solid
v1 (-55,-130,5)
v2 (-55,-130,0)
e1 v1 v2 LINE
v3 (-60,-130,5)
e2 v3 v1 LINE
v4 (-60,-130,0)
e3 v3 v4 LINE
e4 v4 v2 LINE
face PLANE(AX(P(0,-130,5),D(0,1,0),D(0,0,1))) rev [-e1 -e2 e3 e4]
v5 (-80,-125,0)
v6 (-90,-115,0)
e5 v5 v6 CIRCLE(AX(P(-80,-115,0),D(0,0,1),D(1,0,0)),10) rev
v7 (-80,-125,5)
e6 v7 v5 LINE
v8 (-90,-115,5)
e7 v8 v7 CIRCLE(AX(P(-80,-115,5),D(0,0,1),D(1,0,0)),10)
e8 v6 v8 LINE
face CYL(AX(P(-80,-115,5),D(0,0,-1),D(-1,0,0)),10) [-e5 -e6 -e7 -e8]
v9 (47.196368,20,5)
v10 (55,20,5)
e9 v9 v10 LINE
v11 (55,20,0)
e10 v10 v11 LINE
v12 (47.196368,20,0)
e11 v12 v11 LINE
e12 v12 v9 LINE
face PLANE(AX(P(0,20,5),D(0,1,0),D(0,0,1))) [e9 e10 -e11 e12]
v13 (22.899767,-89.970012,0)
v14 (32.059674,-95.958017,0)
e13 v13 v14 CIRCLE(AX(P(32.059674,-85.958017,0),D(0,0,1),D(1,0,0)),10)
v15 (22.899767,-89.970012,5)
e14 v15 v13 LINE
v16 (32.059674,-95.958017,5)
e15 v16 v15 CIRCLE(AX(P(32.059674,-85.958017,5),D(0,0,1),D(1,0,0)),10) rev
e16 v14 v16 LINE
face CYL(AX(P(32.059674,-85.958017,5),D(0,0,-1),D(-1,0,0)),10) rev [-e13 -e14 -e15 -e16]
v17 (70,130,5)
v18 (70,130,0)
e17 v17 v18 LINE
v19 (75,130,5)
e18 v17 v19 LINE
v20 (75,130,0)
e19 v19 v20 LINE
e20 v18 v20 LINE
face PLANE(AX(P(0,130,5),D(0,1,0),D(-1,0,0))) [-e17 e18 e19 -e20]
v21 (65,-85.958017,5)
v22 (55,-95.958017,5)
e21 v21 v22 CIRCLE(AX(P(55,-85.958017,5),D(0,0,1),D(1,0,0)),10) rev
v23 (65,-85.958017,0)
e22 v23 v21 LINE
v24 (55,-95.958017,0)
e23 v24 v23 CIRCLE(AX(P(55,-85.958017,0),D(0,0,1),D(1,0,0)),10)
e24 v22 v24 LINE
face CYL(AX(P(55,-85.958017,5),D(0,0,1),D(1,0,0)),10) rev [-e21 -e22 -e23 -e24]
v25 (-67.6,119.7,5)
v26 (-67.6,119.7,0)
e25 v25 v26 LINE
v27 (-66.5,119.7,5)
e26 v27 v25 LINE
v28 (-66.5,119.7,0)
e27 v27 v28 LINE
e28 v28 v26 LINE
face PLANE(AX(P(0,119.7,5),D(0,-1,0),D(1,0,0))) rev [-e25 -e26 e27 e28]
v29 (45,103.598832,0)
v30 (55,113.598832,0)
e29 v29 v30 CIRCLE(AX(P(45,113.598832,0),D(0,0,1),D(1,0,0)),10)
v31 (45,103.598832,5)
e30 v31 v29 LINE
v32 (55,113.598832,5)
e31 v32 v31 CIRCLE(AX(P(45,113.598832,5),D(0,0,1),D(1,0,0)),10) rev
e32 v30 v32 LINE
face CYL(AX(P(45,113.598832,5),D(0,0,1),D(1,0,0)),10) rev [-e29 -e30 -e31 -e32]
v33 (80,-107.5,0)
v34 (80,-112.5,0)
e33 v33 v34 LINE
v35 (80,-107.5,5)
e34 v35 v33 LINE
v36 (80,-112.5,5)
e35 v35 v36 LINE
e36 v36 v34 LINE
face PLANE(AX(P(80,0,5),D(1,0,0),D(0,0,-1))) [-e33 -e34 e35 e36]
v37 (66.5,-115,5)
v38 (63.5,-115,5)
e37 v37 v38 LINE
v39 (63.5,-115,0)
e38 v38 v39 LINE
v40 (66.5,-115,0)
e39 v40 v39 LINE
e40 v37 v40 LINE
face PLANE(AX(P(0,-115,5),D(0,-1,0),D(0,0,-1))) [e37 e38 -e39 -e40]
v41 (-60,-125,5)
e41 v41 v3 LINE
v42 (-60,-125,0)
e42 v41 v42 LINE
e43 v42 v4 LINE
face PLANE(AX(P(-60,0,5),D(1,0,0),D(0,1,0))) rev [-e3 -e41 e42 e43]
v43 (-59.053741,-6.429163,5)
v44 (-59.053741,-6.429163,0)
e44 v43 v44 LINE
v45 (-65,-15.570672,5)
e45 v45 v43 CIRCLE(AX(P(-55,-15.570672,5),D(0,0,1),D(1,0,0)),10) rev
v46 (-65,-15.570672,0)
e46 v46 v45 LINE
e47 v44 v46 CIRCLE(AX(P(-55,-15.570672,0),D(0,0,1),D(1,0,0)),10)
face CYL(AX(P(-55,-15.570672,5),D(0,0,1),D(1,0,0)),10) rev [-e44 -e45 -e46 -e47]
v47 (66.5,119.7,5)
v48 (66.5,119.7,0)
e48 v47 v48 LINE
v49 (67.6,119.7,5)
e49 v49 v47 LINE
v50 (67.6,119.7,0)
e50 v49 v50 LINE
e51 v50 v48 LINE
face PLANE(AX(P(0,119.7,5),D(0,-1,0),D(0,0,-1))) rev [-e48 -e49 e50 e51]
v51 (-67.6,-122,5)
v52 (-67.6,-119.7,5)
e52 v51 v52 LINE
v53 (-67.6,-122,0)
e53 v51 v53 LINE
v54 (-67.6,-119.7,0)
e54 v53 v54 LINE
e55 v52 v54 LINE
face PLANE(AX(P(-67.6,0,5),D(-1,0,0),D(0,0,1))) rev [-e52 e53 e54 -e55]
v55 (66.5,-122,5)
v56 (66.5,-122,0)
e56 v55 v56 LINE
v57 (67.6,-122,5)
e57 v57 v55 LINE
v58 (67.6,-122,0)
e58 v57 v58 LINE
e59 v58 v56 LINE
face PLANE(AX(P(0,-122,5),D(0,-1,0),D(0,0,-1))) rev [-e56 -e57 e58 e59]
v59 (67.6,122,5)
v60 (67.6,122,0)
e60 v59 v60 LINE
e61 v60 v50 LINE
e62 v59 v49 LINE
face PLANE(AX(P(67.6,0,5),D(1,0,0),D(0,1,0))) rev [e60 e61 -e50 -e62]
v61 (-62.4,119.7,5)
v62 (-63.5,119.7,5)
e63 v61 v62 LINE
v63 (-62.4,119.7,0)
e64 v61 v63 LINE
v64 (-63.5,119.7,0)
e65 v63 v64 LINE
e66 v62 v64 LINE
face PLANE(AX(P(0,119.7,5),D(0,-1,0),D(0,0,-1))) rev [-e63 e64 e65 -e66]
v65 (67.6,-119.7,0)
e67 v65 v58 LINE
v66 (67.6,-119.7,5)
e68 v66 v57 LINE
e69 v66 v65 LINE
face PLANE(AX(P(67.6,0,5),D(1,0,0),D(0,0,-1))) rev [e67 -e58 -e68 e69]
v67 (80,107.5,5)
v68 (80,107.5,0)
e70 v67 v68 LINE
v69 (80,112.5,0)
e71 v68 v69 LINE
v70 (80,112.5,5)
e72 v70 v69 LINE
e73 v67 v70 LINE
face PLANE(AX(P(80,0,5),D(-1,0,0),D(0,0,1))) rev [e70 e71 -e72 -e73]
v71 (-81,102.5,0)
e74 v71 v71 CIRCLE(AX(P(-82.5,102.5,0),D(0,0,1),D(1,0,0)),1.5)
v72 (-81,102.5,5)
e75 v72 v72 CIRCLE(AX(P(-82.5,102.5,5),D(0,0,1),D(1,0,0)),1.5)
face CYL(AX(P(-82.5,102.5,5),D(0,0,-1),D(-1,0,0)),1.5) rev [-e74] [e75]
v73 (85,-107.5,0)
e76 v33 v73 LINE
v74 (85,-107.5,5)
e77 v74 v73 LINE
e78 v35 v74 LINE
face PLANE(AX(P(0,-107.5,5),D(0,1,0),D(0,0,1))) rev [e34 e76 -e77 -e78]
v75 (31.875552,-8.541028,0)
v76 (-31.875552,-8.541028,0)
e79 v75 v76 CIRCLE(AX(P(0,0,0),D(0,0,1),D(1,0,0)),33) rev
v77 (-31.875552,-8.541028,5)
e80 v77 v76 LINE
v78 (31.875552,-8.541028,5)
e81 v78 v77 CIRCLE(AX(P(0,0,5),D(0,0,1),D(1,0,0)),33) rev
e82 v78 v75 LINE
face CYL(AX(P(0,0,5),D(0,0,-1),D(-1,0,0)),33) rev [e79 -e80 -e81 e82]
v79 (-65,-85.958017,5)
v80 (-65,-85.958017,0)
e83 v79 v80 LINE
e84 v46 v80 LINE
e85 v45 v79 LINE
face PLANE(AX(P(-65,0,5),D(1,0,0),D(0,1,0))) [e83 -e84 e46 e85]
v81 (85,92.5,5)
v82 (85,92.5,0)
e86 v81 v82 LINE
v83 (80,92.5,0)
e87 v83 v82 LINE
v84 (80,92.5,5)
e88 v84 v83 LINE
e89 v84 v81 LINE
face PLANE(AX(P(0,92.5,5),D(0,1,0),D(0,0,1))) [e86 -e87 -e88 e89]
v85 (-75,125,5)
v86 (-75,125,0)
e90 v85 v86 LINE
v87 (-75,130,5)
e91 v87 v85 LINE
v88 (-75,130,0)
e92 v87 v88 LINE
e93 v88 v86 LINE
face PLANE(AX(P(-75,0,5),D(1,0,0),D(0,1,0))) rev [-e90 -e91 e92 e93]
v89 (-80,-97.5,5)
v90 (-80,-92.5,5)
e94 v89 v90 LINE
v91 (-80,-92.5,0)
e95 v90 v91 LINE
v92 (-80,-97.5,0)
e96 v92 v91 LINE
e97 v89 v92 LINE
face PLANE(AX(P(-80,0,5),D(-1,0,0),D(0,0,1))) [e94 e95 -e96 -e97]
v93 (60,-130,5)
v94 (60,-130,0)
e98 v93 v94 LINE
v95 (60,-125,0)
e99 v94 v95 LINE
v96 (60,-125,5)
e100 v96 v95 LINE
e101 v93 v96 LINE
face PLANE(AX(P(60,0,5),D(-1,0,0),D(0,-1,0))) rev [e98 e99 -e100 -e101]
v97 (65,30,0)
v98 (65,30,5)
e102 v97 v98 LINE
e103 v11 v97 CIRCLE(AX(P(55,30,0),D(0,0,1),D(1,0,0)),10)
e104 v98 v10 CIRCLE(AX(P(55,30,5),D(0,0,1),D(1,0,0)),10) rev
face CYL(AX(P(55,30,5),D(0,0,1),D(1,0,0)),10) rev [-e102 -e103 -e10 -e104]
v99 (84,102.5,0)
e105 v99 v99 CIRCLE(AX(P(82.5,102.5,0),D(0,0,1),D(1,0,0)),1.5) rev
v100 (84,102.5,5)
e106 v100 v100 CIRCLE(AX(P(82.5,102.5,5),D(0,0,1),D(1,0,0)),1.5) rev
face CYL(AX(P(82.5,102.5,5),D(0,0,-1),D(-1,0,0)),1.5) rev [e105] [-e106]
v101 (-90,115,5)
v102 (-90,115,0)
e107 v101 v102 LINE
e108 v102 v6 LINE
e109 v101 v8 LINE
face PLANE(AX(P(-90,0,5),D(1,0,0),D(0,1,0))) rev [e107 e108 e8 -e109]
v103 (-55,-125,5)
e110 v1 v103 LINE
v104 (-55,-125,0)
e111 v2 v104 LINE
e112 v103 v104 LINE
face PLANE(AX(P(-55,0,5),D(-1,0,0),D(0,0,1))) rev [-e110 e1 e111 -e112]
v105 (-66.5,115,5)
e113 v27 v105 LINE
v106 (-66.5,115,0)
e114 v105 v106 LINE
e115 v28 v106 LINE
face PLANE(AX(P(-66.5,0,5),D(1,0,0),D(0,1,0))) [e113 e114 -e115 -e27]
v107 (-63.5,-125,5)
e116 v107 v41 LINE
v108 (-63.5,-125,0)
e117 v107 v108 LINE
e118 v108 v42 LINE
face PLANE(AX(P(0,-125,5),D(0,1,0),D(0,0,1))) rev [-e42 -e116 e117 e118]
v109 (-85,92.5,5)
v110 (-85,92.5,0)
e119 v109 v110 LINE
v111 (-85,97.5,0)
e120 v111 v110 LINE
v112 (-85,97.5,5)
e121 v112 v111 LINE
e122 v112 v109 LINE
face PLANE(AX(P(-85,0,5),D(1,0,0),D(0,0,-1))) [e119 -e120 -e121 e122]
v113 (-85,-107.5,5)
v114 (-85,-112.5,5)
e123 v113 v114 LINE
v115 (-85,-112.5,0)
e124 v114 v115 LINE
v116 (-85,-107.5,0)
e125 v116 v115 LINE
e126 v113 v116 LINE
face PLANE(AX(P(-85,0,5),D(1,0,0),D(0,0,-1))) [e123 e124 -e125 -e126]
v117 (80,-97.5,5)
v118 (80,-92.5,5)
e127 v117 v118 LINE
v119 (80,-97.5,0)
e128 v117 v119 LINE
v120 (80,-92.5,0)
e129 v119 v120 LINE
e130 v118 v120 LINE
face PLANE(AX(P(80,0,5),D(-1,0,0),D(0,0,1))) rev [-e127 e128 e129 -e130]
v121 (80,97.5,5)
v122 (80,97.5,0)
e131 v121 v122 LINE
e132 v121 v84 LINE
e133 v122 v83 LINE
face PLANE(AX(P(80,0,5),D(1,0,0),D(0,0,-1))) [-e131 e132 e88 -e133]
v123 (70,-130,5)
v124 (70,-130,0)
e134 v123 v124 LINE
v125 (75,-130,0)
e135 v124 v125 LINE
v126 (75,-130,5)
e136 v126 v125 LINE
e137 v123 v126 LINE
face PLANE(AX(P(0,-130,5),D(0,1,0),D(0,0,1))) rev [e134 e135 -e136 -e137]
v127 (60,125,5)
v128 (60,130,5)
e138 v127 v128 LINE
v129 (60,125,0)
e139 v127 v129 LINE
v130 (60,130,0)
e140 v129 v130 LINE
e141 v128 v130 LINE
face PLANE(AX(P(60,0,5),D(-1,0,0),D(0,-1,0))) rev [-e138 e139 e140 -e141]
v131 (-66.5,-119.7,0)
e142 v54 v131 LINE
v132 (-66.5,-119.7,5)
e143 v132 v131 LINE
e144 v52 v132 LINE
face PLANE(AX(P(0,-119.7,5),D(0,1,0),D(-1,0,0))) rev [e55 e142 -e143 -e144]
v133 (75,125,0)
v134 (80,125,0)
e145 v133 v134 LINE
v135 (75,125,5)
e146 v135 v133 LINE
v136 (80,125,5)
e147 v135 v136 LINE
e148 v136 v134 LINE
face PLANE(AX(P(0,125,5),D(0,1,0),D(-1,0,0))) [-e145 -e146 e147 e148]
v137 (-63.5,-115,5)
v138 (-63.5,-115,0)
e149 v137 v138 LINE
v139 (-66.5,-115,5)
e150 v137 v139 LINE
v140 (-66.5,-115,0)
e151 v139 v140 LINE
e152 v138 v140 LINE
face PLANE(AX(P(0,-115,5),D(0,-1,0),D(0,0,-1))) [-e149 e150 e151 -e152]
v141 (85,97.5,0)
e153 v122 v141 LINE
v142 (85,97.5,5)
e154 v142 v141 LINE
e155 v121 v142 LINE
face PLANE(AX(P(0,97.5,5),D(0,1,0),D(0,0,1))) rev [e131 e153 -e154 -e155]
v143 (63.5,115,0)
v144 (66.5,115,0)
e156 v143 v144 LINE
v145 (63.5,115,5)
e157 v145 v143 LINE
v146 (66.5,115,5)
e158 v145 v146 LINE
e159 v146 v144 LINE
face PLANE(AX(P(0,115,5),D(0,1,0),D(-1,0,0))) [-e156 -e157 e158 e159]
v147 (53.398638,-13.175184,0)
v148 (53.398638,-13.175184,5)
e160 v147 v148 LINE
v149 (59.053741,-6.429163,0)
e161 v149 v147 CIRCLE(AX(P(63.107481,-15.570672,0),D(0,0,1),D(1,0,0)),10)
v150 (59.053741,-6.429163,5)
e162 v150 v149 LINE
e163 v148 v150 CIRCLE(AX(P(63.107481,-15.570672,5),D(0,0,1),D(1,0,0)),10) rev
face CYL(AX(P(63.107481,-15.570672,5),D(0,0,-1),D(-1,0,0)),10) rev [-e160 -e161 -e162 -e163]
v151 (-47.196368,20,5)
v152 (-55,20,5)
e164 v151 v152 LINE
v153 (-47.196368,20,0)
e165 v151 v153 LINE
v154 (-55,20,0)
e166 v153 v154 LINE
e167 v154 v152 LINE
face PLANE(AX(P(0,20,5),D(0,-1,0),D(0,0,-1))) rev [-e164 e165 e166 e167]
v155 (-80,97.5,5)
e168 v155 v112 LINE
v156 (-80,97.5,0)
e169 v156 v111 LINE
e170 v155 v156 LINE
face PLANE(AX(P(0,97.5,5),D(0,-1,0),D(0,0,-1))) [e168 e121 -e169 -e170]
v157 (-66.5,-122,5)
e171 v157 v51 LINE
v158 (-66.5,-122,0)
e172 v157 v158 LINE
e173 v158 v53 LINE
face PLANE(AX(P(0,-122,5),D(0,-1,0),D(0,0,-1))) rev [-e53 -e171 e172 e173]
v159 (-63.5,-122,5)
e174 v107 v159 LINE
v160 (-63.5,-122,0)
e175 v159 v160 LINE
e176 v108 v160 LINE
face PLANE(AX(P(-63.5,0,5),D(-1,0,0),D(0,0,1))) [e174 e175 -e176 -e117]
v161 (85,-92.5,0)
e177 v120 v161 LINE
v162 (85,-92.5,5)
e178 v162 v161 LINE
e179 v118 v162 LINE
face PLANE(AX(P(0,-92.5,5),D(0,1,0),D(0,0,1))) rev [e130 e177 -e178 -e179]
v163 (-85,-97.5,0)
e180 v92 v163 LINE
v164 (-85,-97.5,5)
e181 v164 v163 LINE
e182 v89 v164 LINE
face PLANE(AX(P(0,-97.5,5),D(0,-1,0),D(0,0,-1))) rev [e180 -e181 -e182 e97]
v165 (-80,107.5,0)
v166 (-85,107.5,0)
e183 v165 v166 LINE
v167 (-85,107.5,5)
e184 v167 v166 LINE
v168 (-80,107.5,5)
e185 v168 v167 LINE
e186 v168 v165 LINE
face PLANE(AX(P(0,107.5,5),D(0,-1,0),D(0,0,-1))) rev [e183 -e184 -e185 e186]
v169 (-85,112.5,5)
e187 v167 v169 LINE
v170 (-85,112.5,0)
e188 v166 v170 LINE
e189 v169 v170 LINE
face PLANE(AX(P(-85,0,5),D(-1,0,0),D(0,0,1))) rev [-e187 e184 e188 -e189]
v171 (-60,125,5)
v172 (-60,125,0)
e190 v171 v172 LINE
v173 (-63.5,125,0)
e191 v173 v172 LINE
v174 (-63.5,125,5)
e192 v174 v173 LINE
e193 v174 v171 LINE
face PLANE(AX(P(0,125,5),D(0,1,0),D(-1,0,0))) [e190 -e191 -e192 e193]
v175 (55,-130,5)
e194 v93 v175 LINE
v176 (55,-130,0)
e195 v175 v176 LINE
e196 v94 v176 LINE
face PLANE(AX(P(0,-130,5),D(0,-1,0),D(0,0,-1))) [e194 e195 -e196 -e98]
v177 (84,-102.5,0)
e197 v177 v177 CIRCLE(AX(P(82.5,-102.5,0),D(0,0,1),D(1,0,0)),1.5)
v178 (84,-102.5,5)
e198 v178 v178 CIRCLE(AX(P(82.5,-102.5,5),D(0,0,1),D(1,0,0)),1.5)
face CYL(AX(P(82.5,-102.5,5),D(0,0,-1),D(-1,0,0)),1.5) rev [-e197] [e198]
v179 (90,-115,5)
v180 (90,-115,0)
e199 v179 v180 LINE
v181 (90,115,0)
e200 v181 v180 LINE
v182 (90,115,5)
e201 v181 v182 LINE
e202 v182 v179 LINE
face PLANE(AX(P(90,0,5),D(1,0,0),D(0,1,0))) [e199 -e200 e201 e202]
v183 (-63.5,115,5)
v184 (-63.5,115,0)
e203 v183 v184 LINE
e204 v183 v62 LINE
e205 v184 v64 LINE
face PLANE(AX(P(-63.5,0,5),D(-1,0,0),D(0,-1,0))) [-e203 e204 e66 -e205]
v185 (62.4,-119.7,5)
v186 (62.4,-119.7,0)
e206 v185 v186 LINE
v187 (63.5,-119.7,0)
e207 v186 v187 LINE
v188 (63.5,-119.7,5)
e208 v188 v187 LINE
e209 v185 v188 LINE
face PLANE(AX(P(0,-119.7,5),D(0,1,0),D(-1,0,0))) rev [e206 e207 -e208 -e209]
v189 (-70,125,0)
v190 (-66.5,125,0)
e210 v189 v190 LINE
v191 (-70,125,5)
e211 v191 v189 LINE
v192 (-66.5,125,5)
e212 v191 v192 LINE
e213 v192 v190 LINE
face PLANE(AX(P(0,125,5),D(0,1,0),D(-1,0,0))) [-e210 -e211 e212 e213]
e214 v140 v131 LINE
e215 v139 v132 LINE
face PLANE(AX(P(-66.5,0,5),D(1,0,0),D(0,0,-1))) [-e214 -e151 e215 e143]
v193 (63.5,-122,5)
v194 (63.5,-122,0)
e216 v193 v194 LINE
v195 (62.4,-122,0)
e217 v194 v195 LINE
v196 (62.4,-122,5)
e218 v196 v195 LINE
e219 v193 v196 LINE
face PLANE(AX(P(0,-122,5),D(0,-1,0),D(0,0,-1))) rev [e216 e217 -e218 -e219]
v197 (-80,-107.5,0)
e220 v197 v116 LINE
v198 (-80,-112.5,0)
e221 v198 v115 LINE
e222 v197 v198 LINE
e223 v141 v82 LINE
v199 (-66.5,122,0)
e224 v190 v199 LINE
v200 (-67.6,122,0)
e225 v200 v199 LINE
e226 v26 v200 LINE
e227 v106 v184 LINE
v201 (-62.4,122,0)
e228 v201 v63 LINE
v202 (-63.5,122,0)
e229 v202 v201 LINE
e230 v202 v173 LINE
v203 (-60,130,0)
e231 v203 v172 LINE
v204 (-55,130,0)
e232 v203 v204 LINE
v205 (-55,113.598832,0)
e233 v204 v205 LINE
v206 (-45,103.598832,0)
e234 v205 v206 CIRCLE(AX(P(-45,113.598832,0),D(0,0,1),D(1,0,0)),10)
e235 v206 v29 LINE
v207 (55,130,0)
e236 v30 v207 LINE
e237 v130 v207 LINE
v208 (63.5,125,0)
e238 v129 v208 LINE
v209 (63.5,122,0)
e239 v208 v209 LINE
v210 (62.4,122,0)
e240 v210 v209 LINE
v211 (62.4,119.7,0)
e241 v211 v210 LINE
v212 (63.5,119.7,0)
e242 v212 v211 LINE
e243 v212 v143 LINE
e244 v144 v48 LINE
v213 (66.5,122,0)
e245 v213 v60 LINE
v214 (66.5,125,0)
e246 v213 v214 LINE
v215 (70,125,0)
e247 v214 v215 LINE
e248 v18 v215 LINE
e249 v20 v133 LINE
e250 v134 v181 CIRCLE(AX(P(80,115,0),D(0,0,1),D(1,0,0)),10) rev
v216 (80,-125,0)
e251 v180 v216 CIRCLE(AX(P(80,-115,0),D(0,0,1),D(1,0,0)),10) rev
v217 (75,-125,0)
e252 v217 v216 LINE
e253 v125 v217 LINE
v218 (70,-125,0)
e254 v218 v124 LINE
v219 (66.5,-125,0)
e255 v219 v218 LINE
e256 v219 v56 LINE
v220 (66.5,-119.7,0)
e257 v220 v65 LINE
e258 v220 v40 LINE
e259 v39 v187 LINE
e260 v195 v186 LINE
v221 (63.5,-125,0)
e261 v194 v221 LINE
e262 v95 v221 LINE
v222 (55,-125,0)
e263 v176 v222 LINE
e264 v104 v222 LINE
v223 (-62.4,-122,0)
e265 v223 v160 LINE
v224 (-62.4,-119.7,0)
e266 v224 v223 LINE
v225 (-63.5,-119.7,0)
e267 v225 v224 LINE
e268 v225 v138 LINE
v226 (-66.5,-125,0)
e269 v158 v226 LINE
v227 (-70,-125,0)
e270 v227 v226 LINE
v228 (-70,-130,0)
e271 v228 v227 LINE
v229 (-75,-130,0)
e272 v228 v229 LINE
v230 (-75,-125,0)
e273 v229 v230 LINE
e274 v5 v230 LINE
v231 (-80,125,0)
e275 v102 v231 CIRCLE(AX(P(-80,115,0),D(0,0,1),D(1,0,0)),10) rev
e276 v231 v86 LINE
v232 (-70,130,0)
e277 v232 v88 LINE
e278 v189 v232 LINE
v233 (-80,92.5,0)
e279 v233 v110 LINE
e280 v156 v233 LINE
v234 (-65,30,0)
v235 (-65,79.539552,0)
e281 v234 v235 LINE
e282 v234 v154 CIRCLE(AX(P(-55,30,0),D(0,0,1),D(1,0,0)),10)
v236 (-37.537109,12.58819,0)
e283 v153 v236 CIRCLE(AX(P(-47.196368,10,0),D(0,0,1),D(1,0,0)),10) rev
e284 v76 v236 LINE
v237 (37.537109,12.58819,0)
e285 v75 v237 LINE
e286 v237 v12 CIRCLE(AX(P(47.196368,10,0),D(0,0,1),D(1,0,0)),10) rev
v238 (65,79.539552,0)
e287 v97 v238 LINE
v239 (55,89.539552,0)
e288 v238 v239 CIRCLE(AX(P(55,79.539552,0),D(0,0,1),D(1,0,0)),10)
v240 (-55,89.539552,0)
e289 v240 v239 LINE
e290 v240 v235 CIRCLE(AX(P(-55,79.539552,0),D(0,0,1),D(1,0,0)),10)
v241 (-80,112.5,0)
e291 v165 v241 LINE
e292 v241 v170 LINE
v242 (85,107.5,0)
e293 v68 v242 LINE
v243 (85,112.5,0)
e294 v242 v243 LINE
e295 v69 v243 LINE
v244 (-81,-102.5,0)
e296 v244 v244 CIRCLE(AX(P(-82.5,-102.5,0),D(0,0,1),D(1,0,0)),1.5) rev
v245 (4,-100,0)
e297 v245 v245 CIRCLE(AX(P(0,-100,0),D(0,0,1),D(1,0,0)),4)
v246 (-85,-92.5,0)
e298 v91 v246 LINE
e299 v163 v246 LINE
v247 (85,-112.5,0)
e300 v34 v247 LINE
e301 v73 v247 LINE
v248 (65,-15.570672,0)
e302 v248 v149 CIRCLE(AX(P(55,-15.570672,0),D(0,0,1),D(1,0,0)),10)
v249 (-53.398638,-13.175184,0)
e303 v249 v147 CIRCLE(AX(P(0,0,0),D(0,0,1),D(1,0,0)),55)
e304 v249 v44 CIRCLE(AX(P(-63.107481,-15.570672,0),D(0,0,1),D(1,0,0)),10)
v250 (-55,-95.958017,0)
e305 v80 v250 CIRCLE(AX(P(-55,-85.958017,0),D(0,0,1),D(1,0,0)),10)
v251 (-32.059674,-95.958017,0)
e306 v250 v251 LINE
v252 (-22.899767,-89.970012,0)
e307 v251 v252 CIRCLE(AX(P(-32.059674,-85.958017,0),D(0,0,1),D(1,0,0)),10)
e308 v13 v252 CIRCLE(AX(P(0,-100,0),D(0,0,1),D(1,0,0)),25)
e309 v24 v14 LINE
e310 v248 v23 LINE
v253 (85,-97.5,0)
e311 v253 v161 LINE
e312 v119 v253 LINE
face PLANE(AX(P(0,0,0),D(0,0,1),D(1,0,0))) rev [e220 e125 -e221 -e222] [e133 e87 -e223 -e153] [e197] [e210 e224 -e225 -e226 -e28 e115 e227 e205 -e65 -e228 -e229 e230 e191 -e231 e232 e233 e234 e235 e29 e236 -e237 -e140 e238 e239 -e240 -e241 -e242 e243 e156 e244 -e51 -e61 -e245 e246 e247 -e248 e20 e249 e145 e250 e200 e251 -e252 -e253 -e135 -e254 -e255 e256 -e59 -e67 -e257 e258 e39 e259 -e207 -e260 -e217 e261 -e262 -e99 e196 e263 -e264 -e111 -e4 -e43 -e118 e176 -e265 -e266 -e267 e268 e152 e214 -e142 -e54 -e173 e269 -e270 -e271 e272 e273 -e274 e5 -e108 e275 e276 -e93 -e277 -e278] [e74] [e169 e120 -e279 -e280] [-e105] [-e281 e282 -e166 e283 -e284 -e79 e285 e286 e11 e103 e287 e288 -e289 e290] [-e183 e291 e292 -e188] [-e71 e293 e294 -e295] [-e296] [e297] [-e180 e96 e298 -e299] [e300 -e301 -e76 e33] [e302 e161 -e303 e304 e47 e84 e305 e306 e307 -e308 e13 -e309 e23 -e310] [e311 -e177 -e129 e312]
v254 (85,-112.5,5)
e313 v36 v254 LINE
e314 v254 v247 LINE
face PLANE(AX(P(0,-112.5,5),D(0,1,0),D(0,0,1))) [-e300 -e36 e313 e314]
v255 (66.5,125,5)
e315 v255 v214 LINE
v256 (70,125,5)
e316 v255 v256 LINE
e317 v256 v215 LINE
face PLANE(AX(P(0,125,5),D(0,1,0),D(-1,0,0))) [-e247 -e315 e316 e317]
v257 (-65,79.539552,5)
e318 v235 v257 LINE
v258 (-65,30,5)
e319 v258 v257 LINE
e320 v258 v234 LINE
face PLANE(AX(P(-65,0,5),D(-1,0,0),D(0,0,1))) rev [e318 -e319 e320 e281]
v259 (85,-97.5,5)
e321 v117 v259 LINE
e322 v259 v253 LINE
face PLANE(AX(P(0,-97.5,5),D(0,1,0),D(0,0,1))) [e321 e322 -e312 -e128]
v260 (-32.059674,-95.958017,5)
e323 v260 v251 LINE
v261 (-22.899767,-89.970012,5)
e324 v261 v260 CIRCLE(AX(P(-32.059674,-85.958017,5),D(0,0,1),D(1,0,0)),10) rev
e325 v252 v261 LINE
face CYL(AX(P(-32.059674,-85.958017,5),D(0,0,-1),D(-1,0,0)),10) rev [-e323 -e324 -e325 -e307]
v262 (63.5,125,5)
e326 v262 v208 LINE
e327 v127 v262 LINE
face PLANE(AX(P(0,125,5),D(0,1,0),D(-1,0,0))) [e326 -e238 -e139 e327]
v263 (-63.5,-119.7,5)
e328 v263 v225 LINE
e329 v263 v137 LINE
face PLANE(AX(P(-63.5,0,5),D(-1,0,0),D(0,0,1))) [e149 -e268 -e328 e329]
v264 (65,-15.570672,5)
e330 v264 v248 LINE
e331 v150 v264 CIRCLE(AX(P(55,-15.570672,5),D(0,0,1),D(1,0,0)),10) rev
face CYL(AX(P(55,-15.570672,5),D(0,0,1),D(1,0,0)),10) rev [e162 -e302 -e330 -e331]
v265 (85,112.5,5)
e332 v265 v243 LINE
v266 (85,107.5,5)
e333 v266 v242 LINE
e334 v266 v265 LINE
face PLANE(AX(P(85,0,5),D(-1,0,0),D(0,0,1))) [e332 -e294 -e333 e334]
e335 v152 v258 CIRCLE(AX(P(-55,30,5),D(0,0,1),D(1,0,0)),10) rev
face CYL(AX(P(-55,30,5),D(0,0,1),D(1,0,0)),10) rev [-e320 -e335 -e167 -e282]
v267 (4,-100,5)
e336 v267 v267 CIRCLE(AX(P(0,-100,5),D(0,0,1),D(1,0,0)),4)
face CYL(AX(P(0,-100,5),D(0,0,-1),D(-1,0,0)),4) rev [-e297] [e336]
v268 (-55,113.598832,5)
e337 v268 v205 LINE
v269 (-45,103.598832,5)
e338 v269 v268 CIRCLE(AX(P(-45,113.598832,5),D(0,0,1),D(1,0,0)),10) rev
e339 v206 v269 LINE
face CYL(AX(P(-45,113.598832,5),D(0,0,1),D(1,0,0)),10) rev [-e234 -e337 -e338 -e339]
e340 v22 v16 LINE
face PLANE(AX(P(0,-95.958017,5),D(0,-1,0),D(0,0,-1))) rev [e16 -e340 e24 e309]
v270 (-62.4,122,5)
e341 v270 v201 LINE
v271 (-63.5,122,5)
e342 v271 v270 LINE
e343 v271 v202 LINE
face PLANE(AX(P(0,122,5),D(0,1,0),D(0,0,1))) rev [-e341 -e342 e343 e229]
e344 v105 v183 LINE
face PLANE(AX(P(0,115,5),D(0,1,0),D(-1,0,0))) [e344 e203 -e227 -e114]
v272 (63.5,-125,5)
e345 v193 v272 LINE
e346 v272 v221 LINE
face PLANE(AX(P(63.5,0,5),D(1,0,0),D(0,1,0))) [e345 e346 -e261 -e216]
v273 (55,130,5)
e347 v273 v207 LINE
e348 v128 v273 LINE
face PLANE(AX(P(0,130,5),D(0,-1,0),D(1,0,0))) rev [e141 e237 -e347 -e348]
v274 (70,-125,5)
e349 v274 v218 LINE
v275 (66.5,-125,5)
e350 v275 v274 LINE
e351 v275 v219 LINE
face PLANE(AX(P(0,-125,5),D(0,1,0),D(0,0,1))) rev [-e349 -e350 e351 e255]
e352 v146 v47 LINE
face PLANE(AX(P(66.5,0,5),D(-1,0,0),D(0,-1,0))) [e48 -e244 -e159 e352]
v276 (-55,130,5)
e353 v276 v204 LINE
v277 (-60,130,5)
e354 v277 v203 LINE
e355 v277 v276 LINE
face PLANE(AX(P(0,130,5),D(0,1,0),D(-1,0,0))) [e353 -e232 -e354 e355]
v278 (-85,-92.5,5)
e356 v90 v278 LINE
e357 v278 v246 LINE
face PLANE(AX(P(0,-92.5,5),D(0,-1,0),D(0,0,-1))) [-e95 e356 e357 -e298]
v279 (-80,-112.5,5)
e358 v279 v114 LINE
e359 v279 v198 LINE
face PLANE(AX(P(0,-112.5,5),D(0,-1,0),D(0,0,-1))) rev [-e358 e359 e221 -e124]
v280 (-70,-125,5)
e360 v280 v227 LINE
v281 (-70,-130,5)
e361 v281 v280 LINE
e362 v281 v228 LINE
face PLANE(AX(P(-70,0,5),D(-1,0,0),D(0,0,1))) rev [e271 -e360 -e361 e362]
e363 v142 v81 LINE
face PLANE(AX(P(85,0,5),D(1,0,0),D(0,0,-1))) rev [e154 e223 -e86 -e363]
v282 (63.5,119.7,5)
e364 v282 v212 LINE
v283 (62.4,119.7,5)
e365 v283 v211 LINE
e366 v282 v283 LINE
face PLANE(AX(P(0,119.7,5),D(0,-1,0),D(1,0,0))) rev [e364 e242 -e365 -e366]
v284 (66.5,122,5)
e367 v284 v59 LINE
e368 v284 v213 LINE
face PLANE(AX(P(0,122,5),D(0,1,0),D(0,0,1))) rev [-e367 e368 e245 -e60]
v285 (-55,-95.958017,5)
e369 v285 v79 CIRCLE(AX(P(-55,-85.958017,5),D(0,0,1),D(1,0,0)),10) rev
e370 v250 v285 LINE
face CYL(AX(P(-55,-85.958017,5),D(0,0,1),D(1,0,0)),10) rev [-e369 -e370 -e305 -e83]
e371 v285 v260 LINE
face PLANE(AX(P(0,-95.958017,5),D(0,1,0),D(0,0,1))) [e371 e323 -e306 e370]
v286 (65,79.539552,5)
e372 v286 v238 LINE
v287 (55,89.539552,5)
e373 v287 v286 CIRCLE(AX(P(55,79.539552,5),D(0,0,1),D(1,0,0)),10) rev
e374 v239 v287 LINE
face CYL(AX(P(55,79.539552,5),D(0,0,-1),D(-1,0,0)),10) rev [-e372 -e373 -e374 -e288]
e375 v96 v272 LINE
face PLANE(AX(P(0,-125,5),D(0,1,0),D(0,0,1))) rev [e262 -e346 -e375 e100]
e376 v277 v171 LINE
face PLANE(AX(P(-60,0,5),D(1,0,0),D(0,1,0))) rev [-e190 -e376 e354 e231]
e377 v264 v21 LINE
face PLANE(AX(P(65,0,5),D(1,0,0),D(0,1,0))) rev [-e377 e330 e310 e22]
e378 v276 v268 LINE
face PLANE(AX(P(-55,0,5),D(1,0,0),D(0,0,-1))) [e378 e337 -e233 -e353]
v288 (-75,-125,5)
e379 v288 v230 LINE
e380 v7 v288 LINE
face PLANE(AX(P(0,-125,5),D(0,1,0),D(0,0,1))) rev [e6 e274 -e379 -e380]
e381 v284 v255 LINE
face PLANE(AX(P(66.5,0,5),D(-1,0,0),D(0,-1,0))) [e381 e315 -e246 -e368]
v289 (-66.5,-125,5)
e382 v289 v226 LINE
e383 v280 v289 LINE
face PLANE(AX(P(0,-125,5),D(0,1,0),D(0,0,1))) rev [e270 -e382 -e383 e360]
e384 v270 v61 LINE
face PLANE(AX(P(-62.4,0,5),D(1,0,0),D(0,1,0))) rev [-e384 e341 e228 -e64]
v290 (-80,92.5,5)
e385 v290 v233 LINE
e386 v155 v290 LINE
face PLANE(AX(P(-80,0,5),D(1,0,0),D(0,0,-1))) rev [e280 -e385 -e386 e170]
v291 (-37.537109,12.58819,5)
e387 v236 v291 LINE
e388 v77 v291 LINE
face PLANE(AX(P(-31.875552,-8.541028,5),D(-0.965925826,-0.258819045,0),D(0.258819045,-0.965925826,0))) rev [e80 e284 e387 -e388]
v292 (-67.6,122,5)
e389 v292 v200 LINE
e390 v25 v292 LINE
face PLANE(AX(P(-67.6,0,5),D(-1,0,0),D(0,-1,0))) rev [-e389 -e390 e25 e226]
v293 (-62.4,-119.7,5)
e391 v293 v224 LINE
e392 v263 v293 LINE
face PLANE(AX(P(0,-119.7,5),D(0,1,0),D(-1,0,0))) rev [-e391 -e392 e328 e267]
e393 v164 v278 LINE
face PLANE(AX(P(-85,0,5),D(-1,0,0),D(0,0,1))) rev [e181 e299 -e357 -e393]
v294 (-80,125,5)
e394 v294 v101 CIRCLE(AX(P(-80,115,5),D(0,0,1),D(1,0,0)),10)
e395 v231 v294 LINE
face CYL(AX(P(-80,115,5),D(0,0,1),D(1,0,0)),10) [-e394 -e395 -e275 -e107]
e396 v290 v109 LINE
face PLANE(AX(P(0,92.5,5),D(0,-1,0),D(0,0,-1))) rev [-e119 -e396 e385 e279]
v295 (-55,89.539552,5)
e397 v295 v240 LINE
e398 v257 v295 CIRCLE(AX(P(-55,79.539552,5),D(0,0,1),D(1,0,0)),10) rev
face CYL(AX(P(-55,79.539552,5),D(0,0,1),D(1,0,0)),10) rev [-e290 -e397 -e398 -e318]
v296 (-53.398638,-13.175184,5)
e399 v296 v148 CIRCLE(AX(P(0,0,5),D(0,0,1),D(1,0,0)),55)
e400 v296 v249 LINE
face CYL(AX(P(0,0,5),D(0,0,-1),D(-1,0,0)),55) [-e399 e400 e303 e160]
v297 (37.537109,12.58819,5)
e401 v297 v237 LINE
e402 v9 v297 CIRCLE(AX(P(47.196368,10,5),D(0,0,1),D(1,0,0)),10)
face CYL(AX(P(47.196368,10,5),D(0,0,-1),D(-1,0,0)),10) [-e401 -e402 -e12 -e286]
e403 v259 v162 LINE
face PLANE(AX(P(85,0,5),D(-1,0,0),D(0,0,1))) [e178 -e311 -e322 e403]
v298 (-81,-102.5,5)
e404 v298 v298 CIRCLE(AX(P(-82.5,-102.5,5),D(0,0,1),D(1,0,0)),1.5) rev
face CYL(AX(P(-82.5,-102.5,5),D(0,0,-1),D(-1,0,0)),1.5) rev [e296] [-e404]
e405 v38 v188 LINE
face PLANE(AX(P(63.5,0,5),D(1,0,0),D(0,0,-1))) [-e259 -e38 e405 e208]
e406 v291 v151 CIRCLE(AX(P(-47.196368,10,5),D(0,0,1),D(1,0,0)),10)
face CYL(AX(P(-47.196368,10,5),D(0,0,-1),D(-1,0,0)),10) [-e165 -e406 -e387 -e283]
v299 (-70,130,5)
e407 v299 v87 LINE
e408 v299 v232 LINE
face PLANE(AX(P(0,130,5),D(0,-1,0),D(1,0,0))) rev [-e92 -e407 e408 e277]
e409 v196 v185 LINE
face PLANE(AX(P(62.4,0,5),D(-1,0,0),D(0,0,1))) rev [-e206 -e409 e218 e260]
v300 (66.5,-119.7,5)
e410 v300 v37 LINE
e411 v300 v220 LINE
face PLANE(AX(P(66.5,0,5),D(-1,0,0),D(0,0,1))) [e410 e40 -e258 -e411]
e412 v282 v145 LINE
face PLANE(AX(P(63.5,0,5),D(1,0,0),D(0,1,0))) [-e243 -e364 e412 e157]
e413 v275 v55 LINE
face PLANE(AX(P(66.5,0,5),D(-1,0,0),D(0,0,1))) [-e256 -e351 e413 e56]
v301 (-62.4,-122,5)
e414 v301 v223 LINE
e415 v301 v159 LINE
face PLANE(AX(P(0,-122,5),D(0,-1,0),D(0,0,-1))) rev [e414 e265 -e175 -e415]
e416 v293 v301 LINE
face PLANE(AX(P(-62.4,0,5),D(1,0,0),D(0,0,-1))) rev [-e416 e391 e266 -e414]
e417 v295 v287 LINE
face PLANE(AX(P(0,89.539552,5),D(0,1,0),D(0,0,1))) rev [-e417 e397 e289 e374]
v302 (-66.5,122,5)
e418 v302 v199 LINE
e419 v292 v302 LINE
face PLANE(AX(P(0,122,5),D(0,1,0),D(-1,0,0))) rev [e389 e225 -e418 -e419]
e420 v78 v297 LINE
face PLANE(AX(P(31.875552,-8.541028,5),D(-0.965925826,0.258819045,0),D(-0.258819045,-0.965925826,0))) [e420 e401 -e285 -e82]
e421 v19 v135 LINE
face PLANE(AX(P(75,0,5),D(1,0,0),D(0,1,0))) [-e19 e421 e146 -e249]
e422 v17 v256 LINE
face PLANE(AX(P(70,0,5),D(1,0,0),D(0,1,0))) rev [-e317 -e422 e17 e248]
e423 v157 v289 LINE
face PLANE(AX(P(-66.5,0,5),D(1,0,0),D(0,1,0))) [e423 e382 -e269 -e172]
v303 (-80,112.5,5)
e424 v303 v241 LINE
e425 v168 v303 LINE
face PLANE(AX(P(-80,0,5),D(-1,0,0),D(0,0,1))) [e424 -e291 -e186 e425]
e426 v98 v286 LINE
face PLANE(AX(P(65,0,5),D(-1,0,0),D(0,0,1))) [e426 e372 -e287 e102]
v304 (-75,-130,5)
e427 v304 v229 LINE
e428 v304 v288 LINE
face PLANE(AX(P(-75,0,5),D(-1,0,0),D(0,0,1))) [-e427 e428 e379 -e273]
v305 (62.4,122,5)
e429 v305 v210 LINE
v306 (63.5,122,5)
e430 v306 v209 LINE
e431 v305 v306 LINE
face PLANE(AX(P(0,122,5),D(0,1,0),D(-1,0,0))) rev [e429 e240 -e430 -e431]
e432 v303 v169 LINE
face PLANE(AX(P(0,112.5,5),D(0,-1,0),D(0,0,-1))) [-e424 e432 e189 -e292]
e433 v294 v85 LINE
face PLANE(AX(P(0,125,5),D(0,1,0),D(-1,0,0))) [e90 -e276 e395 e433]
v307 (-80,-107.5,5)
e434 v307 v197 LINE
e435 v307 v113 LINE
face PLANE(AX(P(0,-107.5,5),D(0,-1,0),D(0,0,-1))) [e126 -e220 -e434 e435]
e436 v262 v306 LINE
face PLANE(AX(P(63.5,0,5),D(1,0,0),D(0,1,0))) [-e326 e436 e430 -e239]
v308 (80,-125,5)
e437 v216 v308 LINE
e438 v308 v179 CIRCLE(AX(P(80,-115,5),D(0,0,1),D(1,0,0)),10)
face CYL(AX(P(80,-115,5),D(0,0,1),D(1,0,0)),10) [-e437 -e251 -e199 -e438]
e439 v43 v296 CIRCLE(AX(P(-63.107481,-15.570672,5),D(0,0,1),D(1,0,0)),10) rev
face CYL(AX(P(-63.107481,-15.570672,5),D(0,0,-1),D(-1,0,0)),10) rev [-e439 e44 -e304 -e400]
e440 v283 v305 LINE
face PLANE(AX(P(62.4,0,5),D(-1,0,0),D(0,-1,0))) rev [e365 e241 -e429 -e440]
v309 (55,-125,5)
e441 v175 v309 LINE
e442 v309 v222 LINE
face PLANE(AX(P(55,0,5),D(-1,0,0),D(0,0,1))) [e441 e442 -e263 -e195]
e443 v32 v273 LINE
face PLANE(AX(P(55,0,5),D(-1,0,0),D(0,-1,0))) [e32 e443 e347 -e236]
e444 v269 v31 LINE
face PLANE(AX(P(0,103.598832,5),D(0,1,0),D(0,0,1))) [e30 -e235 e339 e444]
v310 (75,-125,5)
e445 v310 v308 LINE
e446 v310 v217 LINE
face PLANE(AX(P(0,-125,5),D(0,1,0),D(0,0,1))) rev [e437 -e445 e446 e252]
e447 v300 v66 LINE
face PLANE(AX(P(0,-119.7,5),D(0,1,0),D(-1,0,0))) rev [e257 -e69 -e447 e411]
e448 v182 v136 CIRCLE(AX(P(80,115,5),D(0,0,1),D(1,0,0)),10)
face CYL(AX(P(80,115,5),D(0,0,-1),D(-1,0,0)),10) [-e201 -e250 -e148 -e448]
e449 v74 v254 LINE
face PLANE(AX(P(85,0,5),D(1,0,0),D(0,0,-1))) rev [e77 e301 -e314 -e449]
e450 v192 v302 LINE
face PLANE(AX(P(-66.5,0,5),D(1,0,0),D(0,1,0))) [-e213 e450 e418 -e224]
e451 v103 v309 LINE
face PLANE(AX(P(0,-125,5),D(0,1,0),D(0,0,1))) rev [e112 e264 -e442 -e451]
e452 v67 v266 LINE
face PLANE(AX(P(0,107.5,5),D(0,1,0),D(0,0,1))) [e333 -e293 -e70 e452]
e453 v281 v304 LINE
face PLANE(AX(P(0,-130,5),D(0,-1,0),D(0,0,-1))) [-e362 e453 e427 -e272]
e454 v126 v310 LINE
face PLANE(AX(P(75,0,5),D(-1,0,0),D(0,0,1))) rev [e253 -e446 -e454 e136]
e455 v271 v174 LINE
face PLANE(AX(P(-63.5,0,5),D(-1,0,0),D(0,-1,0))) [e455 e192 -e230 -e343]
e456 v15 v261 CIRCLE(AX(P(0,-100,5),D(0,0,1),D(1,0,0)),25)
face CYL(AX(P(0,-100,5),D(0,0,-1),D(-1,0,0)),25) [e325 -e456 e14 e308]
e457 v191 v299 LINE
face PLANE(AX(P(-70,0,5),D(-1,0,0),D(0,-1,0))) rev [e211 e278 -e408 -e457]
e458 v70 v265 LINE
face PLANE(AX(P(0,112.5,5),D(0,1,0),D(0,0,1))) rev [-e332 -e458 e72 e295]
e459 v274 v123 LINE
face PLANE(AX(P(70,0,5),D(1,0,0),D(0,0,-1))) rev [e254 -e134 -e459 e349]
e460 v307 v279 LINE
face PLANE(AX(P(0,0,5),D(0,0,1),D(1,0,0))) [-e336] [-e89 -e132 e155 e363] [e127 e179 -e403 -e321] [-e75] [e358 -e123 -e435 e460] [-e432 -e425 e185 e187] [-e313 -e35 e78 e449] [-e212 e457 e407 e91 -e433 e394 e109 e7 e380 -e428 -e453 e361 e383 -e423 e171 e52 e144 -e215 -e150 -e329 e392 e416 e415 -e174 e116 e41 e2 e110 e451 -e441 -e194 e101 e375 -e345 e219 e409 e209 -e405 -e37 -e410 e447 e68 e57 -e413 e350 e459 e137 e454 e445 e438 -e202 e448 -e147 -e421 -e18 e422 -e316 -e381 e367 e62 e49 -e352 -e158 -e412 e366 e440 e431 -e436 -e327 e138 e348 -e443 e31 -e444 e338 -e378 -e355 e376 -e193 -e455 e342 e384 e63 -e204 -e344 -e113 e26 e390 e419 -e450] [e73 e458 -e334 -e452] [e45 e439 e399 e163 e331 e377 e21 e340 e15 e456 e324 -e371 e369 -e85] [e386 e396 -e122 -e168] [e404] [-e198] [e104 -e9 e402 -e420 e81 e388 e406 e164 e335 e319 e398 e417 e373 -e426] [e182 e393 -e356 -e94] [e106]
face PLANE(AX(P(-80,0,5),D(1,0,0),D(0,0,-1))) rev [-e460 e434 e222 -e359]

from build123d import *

# Parameters (mm, degrees)
SKETCH1_W           = 5
SKETCH1_H           = 5
SKETCH1_R           = 1.5
SKETCH1_R_2         = 4
BOSS_EXTRUDE1_DEPTH = 5
FILLET1_R           = 10


with BuildPart() as part:
    # Sketch1 → Boss-Extrude1 (new body)
    with BuildSketch(Plane.XY):
        Polygon((-75, 125), (-90, 125), (-90, -125), (-75, -125), (-75, -130), (-70, -130), (-70, -125), (-66.5, -125), (-66.5, -122), (-67.6, -122), (-67.6, -119.7), (-66.5, -119.7), (-66.5, -115), (-63.5, -115), (-63.5, -119.7), (-62.4, -119.7), (-62.4, -122), (-63.5, -122), (-63.5, -125), (-60, -125), (-60, -130), (-55, -130), (-55, -125), (55, -125), (55, -130), (60, -130), (60, -125), (63.5, -125), (63.5, -122), (62.4, -122), (62.4, -119.7), (63.5, -119.7), (63.5, -115), (66.5, -115), (66.5, -119.7), (67.6, -119.7), (67.6, -122), (66.5, -122), (66.5, -125), (70, -125), (70, -130), (75, -130), (75, -125), (90, -125), (90, 125), (75, 125), (75, 130), (70, 130), (70, 125), (66.5, 125), (66.5, 122), (67.6, 122), (67.6, 119.7), (66.5, 119.7), (66.5, 115), (63.5, 115), (63.5, 119.7), (62.4, 119.7), (62.4, 122), (63.5, 122), (63.5, 125), (60, 125), (60, 130), (55, 130), (55, 103.598832104), (-55, 103.598832104), (-55, 130), (-60, 130), (-60, 125), (-63.5, 125), (-63.5, 122), (-62.4, 122), (-62.4, 119.7), (-63.5, 119.7), (-63.5, 115), (-66.5, 115), (-66.5, 119.7), (-67.6, 119.7), (-67.6, 122), (-66.5, 122), (-66.5, 125), (-70, 125), (-70, 130), (-75, 130), align=None)
        with Locations((-82.5, -110)):
            Rectangle(SKETCH1_W, SKETCH1_H, mode=Mode.SUBTRACT)
        with Locations((-82.5, -102.5)):
            Circle(SKETCH1_R, mode=Mode.SUBTRACT)
        with Locations((-82.5, -95)):
            Rectangle(SKETCH1_W, SKETCH1_H, mode=Mode.SUBTRACT)
        with Locations((0, -100)):
            Circle(SKETCH1_R_2, mode=Mode.SUBTRACT)
        with Locations((82.5, -110)):
            Rectangle(SKETCH1_W, SKETCH1_H, mode=Mode.SUBTRACT)
        with Locations((82.5, -102.5)):
            Circle(SKETCH1_R, mode=Mode.SUBTRACT)
        with Locations((82.5, -95)):
            Rectangle(SKETCH1_W, SKETCH1_H, mode=Mode.SUBTRACT)
        with BuildLine():
            Line((-65, -5.570672252), (-54.717160111, -5.570672252))
            ThreePointArc((-54.717160111, -5.570672252), (0, -55), (54.717160111, -5.570672252))
            Line((54.717160111, -5.570672252), (65, -5.570672252))
            Line((65, -5.570672252), (65, -95.958016924))
            Line((65, -95.958016924), (24.671083738, -95.958016924))
            ThreePointArc((24.671083738, -95.958016924), (0, -75), (-24.671083738, -95.958016924))
            Line((-24.671083738, -95.958016924), (-65, -95.958016924))
            Line((-65, -95.958016924), (-65, -5.570672252))
        make_face(mode=Mode.SUBTRACT)
        with Locations((-82.5, 95)):
            Rectangle(SKETCH1_W, SKETCH1_H, mode=Mode.SUBTRACT)
        with Locations((-82.5, 102.5)):
            Circle(SKETCH1_R, mode=Mode.SUBTRACT)
        with Locations((-82.5, 110)):
            Rectangle(SKETCH1_W, SKETCH1_H, mode=Mode.SUBTRACT)
        with BuildLine():
            ThreePointArc((31.875552268, -8.541028488), (0, -33), (-31.875552268, -8.541028488))
            Line((-31.875552268, -8.541028488), (-39.523097802, 20))
            Line((-39.523097802, 20), (-65, 20))
            Line((-65, 20), (-65, 89.539551807))
            Line((-65, 89.539551807), (65, 89.539551807))
            Line((65, 89.539551807), (65, 20))
            Line((65, 20), (39.523097802, 20))
            Line((39.523097802, 20), (31.875552268, -8.541028488))
        make_face(mode=Mode.SUBTRACT)
        with Locations((82.5, 95)):
            Rectangle(SKETCH1_W, SKETCH1_H, mode=Mode.SUBTRACT)
        with Locations((82.5, 102.5)):
            Circle(SKETCH1_R, mode=Mode.SUBTRACT)
        with Locations((82.5, 110)):
            Rectangle(SKETCH1_W, SKETCH1_H, mode=Mode.SUBTRACT)
    extrude(amount=BOSS_EXTRUDE1_DEPTH)

    # Fillet1
    # the kernel refuses this fillet: 10 mm, written as the material it adds along each edge
    with BuildSketch(Plane(origin=(-55, 103.598832104, 0), x_dir=(1, 0, 0), z_dir=(0, 0, 1)), Plane(origin=(55, 103.598832104, 0), x_dir=(0, 1, 0), z_dir=(0, 0, 1)), Plane(origin=(-65, -95.958016924, 0), x_dir=(1, 0, 0), z_dir=(0, 0, 1)), Plane(origin=(65, -95.958016924, 0), x_dir=(0, 1, 0), z_dir=(0, 0, 1)), Plane(origin=(65, -5.570672252, 0), x_dir=(-1, 0, 0), z_dir=(0, 0, 1)), Plane(origin=(-65, -5.570672252, 0), x_dir=(0, -1, 0), z_dir=(0, 0, 1)), Plane(origin=(65, 89.539551807, 0), x_dir=(-1, 0, 0), z_dir=(0, 0, 1)), Plane(origin=(-65, 89.539551807, 0), x_dir=(0, -1, 0), z_dir=(0, 0, 1)), Plane(origin=(65, 20, 0), x_dir=(0, 1, 0), z_dir=(0, 0, 1)), Plane(origin=(-65, 20, 0), x_dir=(1, 0, 0), z_dir=(0, 0, 1))) as fillet1_piece_1:
        with BuildLine():
            CenterArc((FILLET1_R, FILLET1_R), FILLET1_R, 180, 90)
            Line((0, FILLET1_R), (0, 0))
            Line((0, 0), (FILLET1_R, 0))
        make_face()
    extrude(amount=5)
    with BuildSketch(Plane(origin=(24.671083738, -95.958016924, 0), x_dir=(1, 0, 0), z_dir=(0, 0, 1))) as fillet1_piece_2:
        with BuildLine():
            CenterArc((7.388590485, 10), FILLET1_R, 203.653187484, 66.346812516)
            ThreePointArc((-1.771316436, 5.988004835), (-0.697963006, 3.049524687), (0, 0))
            Line((0, 0), (7.388590485, 0))
        make_face()
    extrude(amount=5)
    with BuildSketch(Plane(origin=(-24.671083738, -95.958016924, 0), x_dir=(-1, 0, 0), z_dir=(0, 0, 1))) as fillet1_piece_3:
        with BuildLine():
            CenterArc((7.388590485, -10), FILLET1_R, 90, 66.346812516)
            ThreePointArc((-1.771316436, -5.988004835), (-0.697963006, -3.049524687), (0, 0))
            Line((0, 0), (7.388590485, 0))
        make_face()
    extrude(amount=5)
    with BuildSketch(Plane(origin=(54.717160111, -5.570672252, 0), x_dir=(-0.17083790481511615, -0.9852991476086749, 0), z_dir=(0, 0, 1))) as fillet1_piece_4:
        with BuildLine():
            CenterArc((8.419606625, 9.975355126), FILLET1_R, 189.836540175, 76.140088059)
            Line((-1.433384851, 8.266976078), (0, 0))
            ThreePointArc((0, 0), (3.85898637, 0.135546807), (7.717972739, 0))
        make_face()
    extrude(amount=5)
    with BuildSketch(Plane(origin=(-54.717160111, -5.570672252, 0), x_dir=(-1, 0, 0), z_dir=(0, 0, 1))) as fillet1_piece_5:
        with BuildLine():
            CenterArc((8.390320948, 10), FILLET1_R, 193.859911941, 76.140088059)
            ThreePointArc((-1.318522292, 7.604511961), (-0.525706993, 3.825412513), (0, 0))
            Line((0, 0), (8.390320948, 0))
        make_face()
    extrude(amount=5)
    # the kernel refuses this fillet: 10 mm, written as the material it takes off along each edge
    with BuildSketch(Plane(origin=(-90, -125, -25), x_dir=(0, 1, 0), z_dir=(0, 0, 1)), Plane(origin=(90, -125, -25), x_dir=(-1, 0, 0), z_dir=(0, 0, 1)), Plane(origin=(-90, 125, -25), x_dir=(1, 0, 0), z_dir=(0, 0, 1)), Plane(origin=(90, 125, -25), x_dir=(0, -1, 0), z_dir=(0, 0, 1))) as fillet1_2_piece_1:
        with BuildLine():
            CenterArc((FILLET1_R, -FILLET1_R), FILLET1_R, 90, 90)
            Line((0, -FILLET1_R), (0, 0))
            Line((0, 0), (FILLET1_R, 0))
        make_face()
    extrude(amount=55, mode=Mode.SUBTRACT)
    with BuildSketch(Plane(origin=(39.523097802, 20, -19.183174699), x_dir=(1, 0, 0), z_dir=(0, 0, 1)), Plane(origin=(-39.523097802, 20, -19.183174699), x_dir=(0.2588190451025106, -0.9659258262890711, 0), z_dir=(0, 0, 1))) as fillet1_2_piece_2:
        with BuildLine():
            CenterArc((FILLET1_R * 0.767326987979, -FILLET1_R), FILLET1_R, 90, 75)
            Line((-FILLET1_R * 0.19859883831, -FILLET1_R * 0.741180954897), (0, 0))
            Line((0, 0), (FILLET1_R * 0.767326987979, 0))
        make_face()
    extrude(amount=43.366349399, mode=Mode.SUBTRACT)


solid = part.part
